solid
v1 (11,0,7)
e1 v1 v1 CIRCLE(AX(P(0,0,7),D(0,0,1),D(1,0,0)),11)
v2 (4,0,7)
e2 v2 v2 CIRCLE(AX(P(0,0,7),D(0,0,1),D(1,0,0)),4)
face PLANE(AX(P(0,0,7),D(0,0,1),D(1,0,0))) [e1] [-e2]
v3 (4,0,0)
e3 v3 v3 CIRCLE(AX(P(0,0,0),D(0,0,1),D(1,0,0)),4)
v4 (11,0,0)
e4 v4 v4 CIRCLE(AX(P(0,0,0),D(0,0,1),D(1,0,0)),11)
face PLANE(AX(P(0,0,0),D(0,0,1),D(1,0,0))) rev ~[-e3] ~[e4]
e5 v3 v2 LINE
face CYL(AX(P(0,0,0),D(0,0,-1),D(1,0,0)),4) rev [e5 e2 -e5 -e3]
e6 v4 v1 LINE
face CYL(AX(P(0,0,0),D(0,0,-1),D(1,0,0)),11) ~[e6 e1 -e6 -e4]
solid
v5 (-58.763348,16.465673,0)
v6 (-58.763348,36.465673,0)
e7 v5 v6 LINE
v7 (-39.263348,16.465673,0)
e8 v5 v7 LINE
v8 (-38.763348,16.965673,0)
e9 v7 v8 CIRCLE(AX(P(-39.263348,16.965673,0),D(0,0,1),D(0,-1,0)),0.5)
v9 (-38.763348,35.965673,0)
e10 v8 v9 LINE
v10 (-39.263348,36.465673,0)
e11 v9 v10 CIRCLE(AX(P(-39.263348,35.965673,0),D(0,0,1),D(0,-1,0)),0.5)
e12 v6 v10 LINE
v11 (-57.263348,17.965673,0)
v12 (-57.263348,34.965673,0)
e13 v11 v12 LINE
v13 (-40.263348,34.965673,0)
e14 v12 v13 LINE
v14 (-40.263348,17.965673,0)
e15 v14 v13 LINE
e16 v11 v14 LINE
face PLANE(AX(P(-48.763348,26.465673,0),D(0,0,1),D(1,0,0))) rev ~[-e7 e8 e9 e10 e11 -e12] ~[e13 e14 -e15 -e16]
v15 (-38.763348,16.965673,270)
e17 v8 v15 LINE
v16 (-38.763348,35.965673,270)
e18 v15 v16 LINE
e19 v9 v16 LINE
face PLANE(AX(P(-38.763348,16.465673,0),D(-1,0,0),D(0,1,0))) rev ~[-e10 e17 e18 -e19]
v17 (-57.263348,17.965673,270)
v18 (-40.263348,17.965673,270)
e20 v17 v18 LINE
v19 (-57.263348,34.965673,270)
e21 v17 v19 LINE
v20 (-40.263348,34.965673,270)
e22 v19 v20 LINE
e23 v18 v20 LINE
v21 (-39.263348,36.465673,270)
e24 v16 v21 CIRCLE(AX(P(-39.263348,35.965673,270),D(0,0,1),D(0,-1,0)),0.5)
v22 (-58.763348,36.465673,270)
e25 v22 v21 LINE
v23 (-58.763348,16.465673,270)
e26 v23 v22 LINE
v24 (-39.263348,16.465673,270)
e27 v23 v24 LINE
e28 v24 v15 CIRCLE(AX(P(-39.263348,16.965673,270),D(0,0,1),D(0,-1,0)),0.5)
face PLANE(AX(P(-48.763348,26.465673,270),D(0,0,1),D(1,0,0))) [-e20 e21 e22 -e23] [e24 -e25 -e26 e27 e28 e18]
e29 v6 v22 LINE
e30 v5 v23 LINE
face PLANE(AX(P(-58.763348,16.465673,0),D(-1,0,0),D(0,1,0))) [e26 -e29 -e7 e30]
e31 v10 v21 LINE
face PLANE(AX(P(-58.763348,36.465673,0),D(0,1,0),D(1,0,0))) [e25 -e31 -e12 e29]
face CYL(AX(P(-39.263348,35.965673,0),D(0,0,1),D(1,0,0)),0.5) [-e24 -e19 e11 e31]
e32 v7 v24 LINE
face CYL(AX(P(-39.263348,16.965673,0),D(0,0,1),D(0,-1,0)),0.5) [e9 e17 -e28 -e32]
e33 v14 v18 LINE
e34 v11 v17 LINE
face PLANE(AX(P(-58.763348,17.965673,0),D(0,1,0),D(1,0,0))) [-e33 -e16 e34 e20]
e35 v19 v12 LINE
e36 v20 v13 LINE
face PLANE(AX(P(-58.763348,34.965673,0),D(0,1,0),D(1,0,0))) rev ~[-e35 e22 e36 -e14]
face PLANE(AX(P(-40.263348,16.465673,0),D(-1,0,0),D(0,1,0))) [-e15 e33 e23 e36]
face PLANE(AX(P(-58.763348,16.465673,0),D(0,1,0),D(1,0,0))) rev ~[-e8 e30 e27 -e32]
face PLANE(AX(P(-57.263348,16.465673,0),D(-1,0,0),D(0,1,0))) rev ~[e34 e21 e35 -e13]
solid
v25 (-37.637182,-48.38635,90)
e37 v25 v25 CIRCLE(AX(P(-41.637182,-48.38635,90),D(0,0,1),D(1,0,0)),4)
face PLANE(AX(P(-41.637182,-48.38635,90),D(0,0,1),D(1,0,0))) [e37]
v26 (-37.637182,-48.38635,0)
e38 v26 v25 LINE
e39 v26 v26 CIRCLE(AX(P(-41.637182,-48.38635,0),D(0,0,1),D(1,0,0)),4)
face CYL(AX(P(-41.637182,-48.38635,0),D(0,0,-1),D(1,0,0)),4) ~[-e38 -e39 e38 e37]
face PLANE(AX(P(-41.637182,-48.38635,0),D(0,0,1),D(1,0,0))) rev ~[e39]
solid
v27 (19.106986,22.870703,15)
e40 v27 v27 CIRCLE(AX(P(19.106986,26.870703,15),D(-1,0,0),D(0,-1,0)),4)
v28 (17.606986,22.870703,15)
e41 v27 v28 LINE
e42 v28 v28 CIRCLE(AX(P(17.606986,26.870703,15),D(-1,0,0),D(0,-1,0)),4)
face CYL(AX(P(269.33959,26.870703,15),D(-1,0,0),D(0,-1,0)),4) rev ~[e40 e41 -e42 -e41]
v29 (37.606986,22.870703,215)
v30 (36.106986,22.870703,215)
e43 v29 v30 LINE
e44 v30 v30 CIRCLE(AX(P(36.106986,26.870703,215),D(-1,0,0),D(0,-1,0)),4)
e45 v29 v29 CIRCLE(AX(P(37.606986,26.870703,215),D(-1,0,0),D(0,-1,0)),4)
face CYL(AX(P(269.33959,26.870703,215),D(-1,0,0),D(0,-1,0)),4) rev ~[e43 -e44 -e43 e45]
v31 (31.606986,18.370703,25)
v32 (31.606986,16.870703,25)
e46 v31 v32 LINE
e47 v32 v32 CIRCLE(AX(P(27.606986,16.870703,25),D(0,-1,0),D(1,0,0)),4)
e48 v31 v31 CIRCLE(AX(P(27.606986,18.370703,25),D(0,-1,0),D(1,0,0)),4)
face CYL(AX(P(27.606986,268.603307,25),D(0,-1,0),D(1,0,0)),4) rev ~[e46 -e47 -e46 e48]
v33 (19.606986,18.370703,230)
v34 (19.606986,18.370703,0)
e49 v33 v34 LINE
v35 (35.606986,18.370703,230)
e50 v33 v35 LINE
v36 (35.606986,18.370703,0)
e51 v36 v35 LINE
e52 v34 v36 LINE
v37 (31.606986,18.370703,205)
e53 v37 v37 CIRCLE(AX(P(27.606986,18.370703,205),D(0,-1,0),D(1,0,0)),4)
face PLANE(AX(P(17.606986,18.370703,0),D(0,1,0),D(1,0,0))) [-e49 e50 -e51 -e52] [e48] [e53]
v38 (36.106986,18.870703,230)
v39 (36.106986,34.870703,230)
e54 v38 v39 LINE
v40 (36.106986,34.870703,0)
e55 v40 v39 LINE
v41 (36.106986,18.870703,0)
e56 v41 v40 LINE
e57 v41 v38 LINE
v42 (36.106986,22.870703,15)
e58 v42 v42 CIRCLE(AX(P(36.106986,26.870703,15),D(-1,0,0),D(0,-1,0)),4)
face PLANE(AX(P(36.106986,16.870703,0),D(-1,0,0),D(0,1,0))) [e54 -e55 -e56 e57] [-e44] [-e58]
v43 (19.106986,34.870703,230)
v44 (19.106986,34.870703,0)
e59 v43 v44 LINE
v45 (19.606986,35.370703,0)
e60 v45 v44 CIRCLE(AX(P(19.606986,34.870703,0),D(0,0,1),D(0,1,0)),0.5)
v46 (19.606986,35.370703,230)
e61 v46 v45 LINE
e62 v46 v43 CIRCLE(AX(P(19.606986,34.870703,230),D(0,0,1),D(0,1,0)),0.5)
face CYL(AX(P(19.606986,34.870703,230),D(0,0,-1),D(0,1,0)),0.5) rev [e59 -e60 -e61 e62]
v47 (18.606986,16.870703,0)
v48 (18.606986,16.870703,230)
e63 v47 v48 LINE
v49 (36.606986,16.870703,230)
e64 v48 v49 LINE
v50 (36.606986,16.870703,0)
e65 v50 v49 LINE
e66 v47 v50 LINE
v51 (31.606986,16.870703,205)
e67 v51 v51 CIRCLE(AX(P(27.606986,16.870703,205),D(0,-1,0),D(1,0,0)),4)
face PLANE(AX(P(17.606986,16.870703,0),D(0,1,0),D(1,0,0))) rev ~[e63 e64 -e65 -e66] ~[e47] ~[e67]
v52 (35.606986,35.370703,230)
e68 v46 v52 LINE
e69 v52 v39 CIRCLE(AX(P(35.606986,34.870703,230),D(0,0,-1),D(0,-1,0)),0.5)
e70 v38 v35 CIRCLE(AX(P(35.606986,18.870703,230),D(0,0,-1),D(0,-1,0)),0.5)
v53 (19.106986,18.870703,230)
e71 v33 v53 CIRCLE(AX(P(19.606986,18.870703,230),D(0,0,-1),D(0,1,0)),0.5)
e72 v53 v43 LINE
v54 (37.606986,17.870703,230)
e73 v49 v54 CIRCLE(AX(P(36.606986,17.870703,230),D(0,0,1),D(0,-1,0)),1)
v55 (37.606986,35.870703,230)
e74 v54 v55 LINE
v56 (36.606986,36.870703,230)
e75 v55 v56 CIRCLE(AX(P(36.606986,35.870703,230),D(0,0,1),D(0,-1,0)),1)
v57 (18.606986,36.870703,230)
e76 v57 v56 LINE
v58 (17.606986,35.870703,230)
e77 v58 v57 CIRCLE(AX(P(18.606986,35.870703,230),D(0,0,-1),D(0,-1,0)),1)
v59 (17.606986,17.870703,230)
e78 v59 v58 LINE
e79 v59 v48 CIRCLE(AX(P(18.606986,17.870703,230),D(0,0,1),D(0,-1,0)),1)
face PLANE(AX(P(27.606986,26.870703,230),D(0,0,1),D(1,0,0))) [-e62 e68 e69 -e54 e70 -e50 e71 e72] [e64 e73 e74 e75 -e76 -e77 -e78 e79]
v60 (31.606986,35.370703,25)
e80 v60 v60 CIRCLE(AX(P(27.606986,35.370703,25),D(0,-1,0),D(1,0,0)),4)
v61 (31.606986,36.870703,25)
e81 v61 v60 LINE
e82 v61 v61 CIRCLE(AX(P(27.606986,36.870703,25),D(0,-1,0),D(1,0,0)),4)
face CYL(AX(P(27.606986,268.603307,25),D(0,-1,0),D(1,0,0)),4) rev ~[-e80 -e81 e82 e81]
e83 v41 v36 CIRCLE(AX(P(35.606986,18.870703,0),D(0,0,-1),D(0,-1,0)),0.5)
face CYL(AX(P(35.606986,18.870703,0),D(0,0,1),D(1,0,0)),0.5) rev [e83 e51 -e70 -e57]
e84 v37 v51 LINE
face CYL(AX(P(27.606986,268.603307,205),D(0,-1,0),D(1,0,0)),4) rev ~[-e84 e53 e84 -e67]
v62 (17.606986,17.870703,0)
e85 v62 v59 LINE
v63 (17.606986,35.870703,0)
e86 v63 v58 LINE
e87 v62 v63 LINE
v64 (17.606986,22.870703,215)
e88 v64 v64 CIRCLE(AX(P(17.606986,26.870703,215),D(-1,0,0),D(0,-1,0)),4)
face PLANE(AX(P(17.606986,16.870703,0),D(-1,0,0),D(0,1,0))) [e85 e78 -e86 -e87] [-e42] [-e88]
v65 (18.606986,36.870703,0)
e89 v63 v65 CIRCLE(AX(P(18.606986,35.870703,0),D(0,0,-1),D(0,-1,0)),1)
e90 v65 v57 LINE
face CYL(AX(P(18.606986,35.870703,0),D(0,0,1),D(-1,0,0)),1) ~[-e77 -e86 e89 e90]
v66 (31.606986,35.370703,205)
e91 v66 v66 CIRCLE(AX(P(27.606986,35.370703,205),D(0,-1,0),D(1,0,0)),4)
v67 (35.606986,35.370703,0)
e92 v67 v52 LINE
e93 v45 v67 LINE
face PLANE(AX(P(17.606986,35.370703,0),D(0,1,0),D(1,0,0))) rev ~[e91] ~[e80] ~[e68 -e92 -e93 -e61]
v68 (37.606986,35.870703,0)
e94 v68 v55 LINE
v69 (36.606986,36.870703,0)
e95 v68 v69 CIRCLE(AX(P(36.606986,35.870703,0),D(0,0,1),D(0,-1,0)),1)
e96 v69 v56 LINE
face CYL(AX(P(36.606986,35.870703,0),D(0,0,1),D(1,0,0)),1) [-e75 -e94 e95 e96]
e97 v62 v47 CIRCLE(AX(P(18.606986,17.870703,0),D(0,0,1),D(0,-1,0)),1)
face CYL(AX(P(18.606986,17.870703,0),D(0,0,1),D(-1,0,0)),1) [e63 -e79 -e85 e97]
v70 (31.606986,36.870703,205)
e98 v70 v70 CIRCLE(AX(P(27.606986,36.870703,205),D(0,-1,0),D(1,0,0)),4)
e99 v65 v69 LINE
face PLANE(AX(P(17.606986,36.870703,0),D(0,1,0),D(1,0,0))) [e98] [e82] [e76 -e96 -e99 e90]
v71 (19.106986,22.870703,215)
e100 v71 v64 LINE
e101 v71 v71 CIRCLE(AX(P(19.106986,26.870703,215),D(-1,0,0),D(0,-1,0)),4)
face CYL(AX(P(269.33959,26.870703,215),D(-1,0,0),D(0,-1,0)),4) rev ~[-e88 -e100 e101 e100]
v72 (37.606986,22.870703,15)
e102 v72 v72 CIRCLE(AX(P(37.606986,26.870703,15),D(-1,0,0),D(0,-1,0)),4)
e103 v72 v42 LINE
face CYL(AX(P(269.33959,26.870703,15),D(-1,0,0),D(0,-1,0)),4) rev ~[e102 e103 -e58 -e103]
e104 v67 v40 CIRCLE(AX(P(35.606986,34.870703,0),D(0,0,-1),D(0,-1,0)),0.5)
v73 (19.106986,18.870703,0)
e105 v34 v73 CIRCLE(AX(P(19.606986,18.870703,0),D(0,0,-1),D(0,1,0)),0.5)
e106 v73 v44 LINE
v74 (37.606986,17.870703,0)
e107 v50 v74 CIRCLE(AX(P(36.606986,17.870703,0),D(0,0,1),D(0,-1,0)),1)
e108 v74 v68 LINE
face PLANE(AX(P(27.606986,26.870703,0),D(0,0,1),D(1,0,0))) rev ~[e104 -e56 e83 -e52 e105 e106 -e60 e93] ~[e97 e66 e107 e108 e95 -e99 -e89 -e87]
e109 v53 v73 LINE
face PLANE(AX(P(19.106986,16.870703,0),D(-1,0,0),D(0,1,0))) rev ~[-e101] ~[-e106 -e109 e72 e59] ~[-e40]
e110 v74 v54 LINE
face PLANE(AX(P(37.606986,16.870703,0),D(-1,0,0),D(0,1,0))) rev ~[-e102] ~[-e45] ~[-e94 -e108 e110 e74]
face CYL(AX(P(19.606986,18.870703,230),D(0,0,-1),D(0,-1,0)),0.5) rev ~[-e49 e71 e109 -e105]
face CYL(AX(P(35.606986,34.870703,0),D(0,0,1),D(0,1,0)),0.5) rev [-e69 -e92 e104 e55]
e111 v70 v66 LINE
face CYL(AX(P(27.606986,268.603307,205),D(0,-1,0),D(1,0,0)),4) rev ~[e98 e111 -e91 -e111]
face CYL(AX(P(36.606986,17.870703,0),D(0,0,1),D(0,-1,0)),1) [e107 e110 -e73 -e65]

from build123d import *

# Parameters (mm, degrees)
F1_R      = 11
F1_R_2    = 4
F2_DEPTH  = 7
F3_W      = 20
F3_H      = 20
F4_DEPTH  = 270
F5_R      = 0.5
F6_T      = -1.5
F7_W      = 20
F7_H      = 20
F8_DEPTH  = 230
F9_R      = 1
F10_T     = -1.5
F12_D     = 8
F14_D     = 8
F15_R     = 4
F16_DEPTH = 90
F17_R     = 0.5


with BuildPart() as f2:
    # F1 (on Top) → F2 (new body)
    with BuildSketch(Plane.XY):
        Circle(F1_R)
        Circle(F1_R_2, mode=Mode.SUBTRACT)
    extrude(amount=F2_DEPTH)


with BuildPart() as f4:
    # F3 (on Top) → F4 (new body)
    with BuildSketch(Plane.XY):
        with Locations((-48.7633477896, 26.4656734091)):
            Rectangle(F3_W, F3_H)
    extrude(amount=F4_DEPTH)

    # F5
    f5_edges = [f4.edges().sort_by_distance(p)[0] for p in [
        (-38.763348, 36.465673, 135),
        (-38.763348, 16.465673, 135),
    ]]
    fillet(f5_edges, radius=F5_R)

    # F6
    f6_openings = [f4.faces().sort_by_distance(p)[0] for p in [
        (-48.766001, 26.465673, 270),
        (-48.766001, 26.465673, 0),
    ]]
    offset(amount=F6_T, openings=f6_openings)


with BuildPart() as f8:
    # F7 (on Top) → F8 (new body)
    with BuildSketch(Plane.XY):
        with Locations((27.6069855317, 26.8707028835)):
            Rectangle(F7_W, F7_H)
    extrude(amount=F8_DEPTH)

    # F9
    f9_edges = [f8.edges().sort_by_distance(p)[0] for p in [
        (37.606986, 36.870703, 115),
        (17.606986, 36.870703, 115),
        (37.606986, 16.870703, 115),
        (17.606986, 16.870703, 115),
    ]]
    fillet(f9_edges, radius=F9_R)

    # F10
    f10_openings = [f8.faces().sort_by_distance(p)[0] for p in [
        (27.606986, 26.870703, 230),
        (27.606986, 26.870703, 0),
    ]]
    offset(amount=F10_T, openings=f10_openings)

    # F12 (through all)
    with Locations(Plane.YZ.offset(37.6069855317)):
        with Locations((26.8707028835, 15), (26.8707028835, 215)):
            Hole(F12_D / 2)

    # F14 (through all)
    with Locations(Plane(origin=(0, 36.8707028835, 0), x_dir=(-1, 0, 0), z_dir=(0, 1, 0))):
        with Locations((-27.6069855317, 205), (-27.6069855317, 25)):
            Hole(F14_D / 2)

    # F17
    f17_edges = [f8.edges().sort_by_distance(p)[0] for p in [
        (36.106986, 35.370703, 115),
        (19.106986, 35.370703, 115),
        (36.106986, 18.370703, 115),
        (19.106986, 18.370703, 115),
    ]]
    fillet(f17_edges, radius=F17_R)


with BuildPart() as f16:
    # F15 (on Top) → F16 (new body)
    with BuildSketch(Plane.XY):
        with Locations((-41.6371822357, -48.3863502741)):
            Circle(F15_R)
    extrude(amount=F16_DEPTH)


solid = Compound([f2.part, f4.part, f8.part, f16.part])
